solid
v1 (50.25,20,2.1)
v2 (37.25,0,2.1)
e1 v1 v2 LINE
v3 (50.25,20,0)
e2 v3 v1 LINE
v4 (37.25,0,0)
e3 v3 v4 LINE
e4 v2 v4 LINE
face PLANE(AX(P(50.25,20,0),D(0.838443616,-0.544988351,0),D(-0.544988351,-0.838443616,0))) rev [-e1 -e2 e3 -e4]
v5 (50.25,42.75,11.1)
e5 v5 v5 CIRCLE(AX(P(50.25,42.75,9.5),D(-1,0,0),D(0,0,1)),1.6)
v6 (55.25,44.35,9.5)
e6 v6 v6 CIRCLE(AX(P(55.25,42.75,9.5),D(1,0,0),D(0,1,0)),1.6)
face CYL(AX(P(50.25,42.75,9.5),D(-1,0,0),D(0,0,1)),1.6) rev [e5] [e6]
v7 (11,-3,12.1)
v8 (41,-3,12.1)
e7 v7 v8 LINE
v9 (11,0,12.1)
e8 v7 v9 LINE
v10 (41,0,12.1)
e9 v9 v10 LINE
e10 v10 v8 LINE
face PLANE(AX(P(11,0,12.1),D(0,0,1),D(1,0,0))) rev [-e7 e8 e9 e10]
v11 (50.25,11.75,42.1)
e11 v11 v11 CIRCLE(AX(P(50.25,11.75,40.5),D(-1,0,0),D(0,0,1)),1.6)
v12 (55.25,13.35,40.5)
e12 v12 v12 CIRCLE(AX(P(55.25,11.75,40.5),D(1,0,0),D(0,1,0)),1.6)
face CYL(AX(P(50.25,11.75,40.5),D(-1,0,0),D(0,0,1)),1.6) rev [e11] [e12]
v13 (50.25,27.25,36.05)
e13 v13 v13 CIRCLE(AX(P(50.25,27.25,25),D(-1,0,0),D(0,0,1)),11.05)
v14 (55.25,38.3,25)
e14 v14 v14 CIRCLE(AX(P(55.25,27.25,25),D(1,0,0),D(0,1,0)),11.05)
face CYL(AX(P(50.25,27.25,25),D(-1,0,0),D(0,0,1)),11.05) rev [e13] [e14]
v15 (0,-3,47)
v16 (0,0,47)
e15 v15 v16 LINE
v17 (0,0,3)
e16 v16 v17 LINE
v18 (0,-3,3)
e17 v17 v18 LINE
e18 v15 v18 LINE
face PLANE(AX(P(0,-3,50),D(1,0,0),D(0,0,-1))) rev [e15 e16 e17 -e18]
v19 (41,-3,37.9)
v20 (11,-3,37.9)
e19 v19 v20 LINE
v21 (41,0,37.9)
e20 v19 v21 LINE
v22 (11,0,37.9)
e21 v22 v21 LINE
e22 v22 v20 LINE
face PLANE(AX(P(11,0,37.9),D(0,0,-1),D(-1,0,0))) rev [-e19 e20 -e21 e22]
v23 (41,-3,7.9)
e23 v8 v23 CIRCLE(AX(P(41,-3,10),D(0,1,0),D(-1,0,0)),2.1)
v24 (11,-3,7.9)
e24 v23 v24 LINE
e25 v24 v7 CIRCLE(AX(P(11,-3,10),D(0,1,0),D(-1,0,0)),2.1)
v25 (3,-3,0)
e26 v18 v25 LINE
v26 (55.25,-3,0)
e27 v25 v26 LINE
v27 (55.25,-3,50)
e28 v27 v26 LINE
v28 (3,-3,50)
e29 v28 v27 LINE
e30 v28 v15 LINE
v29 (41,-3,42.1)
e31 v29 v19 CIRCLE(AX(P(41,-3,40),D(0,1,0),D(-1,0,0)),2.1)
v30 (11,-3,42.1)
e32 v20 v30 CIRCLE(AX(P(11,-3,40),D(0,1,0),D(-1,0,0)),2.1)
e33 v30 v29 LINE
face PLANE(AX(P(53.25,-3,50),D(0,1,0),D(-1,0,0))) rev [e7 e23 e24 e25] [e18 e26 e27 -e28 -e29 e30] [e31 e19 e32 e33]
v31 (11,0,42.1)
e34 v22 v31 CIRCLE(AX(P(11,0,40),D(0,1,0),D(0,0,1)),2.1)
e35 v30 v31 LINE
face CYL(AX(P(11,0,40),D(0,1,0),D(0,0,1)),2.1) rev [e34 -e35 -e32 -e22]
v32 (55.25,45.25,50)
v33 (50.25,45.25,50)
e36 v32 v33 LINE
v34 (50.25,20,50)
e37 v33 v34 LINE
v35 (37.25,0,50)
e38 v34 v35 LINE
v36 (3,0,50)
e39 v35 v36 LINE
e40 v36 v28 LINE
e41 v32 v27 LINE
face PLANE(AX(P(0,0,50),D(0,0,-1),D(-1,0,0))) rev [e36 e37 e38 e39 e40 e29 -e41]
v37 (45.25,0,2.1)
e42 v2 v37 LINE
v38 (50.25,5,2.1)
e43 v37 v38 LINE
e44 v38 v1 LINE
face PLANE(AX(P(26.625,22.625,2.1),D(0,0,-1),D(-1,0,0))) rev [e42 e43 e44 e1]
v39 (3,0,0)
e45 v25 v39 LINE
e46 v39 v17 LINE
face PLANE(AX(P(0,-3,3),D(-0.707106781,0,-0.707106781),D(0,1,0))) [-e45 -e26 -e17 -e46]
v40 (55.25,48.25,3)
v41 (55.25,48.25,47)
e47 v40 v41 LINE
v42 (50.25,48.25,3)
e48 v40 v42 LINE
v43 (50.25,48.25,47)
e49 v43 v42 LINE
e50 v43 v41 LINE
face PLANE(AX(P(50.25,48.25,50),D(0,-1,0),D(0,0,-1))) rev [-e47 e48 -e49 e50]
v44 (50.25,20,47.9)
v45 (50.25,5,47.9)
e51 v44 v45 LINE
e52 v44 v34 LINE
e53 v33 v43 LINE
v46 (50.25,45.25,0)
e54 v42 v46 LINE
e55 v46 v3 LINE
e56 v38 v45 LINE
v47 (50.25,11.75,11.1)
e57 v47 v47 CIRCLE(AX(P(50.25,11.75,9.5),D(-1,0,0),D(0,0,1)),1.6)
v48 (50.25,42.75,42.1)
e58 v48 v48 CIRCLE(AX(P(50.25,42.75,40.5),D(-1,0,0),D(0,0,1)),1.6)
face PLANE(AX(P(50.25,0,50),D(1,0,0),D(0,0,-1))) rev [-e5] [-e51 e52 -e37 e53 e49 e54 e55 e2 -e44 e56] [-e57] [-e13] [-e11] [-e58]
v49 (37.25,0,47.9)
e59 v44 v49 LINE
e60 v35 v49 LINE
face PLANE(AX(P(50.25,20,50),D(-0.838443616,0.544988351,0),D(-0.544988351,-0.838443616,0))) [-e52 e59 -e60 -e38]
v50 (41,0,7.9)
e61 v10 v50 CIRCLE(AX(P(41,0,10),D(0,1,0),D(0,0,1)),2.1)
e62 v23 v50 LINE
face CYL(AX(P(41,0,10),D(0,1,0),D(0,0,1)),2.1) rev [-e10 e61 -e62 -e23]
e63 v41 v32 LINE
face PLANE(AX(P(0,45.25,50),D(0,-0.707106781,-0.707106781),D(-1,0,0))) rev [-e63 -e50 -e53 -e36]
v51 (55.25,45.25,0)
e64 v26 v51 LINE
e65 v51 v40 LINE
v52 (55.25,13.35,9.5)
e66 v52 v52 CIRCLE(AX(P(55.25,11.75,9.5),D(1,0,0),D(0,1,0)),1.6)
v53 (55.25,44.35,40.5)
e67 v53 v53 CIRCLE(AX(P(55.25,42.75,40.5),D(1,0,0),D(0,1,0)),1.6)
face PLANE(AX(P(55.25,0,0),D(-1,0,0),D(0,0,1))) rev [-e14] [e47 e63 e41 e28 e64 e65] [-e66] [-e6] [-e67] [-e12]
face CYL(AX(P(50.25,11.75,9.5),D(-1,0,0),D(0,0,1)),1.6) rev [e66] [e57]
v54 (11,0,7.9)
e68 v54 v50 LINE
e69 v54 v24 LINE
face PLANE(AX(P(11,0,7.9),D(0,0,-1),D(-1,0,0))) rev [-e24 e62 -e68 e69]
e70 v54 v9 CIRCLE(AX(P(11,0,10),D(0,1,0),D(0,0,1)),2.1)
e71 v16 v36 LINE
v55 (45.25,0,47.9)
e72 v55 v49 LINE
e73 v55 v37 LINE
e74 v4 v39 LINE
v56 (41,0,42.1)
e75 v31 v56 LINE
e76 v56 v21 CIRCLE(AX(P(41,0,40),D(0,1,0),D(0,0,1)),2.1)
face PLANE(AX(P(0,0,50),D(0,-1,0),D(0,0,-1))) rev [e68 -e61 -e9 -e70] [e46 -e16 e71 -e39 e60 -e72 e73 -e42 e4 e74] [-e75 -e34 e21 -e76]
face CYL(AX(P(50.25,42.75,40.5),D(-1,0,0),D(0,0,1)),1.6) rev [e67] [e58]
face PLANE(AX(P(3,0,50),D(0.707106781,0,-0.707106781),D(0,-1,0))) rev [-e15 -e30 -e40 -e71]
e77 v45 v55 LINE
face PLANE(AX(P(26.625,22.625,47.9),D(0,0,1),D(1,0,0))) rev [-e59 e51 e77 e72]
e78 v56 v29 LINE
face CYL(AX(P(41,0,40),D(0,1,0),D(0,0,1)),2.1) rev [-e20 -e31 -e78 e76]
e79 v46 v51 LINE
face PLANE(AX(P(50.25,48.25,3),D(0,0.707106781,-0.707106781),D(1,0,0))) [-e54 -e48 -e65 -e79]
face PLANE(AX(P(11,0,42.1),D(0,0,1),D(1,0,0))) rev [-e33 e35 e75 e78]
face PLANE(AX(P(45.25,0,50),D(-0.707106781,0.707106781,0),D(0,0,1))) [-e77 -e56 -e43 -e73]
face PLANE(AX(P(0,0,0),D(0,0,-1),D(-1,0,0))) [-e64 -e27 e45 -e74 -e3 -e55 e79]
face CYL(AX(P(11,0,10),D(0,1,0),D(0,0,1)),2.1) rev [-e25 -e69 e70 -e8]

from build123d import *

# Parameters (mm, degrees)
EXTRUDE_1_DEPTH             = 50
HOLE_WIZARD_1_D             = 22.1
HOLE_WIZARD_1_DEPTH         = 100
HOLE_WIZARD_2_D             = 3.2
HOLE_WIZARD_2_DEPTH         = 100
HOLE_START                  = -3
HOLE_WIZARD_4_2_4_2_1_DEPTH = 3
RIB_1_REACH                 = 89.542
SKETCH_13_WALL_W            = 200.93798631
SKETCH_13_WALL_H            = 2.1
CHAMFER_1_SIZE              = 3
EXTRUDE_START               = 2
SKETCH_14_R                 = 1.6
SKETCH_14_R_2               = 11.05
EXTRUDE_2_DEPTH             = 2
CHAMFER_2_SIZE              = 5


# Read off the part's stored shape, not the designer's step: Ø4.2 (4.2) 直径槽口1
with BuildPart() as part:
    # 草图1 → 凸台-拉伸1 (new body)
    with BuildSketch(Plane.XY):
        Polygon((0, 0), (50.25, 0), (50.25, 48.25), (53.25, 48.25), (53.25, -3), (0, -3), align=None)
    extrude(amount=EXTRUDE_1_DEPTH)

    # 孔1
    with Locations(Plane.ZY.offset(-50.25)):
        with Locations((25, 27.25)):
            Hole(HOLE_WIZARD_1_D / 2, depth=HOLE_WIZARD_1_DEPTH)

    # 孔2
    with Locations(Plane.ZY.offset(-50.25)):
        with Locations((9.5, 42.75), (40.5, 42.75), (40.5, 11.75), (9.5, 11.75)):
            Hole(HOLE_WIZARD_2_D / 2, depth=HOLE_WIZARD_2_DEPTH)

    # Ø4.2 (4.2) 直径槽口1 outline → Ø4.2 (4.2) 直径槽口1 (cut)
    with BuildSketch(Plane(origin=(0, 0, 0), x_dir=(1, 0, 0), z_dir=(0, 1, 0)).offset(HOLE_START)):
        with BuildLine():
            Line((11, -42.1), (41, -42.1))
            ThreePointArc((41, -42.1), (43.1, -40), (41, -37.9))
            Line((41, -37.9), (11, -37.9))
            ThreePointArc((11, -37.9), (8.9, -40), (11, -42.1))
        make_face()
        with BuildLine():
            Line((11, -12.1), (41, -12.1))
            ThreePointArc((41, -12.1), (43.1, -10), (41, -7.9))
            Line((41, -7.9), (11, -7.9))
            ThreePointArc((11, -7.9), (8.9, -10), (11, -12.1))
        make_face()
    extrude(amount=HOLE_WIZARD_4_2_4_2_1_DEPTH, mode=Mode.SUBTRACT)

    # 草图13 wall → 筋1 (add, up to next)
    with BuildSketch(Plane(origin=(43.75, 10, 50), x_dir=(-0.544988350595, -0.838443616301, 0), z_dir=(0.838443616301, -0.544988350595, 0)), mode=Mode.PRIVATE) as rib_1_sk1:
        with Locations((0, 1.05)):
            Rectangle(SKETCH_13_WALL_W, SKETCH_13_WALL_H)
    rib_1_tool1 = extrude(rib_1_sk1.sketch, amount=RIB_1_REACH, mode=Mode.PRIVATE) - part.part
    rib_1 = rib_1_tool1.solids().sort_by_distance((43.75, 10, 50))[0]
    add(rib_1)

    # 镜向1: 筋1 across plane
    add(rib_1.mirror(Plane.XY.offset(25)))

    # 倒角1
    chamfer_1_edges = [part.edges().sort_by_distance(p)[0] for p in [
        (51.75, 48.25, 50),
        (0, -1.5, 50),
        (51.75, 48.25, 0),
        (0, -1.5, 0),
    ]]
    chamfer(chamfer_1_edges, length=CHAMFER_1_SIZE)

    # 草图14 → 凸台-拉伸2 (add)
    with BuildSketch(Plane(origin=(53.25, 0, 0), x_dir=(0, 0, -1), z_dir=(1, 0, 0)).offset(EXTRUDE_START)):
        Polygon((-47, 48.25), (-3, 48.25), (0, 45.25), (0, -3), (-50, -3), (-50, 45.25), align=None)
        with Locations(Location((-9.5, 42.75, 0), (0, 0, 180))):
            Circle(SKETCH_14_R, mode=Mode.SUBTRACT)
        with Locations(Location((-40.5, 42.75, 0), (0, 0, 180))):
            Circle(SKETCH_14_R, mode=Mode.SUBTRACT)
        with Locations(Location((-25, 27.25, 0), (0, 0, 180))):
            Circle(SKETCH_14_R_2, mode=Mode.SUBTRACT)
        with Locations(Location((-9.5, 11.75, 0), (0, 0, 180))):
            Circle(SKETCH_14_R, mode=Mode.SUBTRACT)
        with Locations(Location((-40.5, 11.75, 0), (0, 0, 180))):
            Circle(SKETCH_14_R, mode=Mode.SUBTRACT)
    extrude(amount=-EXTRUDE_2_DEPTH)

    # 倒角2
    chamfer_2_edges = [part.edges().sort_by_distance(p)[0] for p in [
        (50.25, 0, 25),
    ]]
    chamfer(chamfer_2_edges, length=CHAMFER_2_SIZE)


solid = part.part
